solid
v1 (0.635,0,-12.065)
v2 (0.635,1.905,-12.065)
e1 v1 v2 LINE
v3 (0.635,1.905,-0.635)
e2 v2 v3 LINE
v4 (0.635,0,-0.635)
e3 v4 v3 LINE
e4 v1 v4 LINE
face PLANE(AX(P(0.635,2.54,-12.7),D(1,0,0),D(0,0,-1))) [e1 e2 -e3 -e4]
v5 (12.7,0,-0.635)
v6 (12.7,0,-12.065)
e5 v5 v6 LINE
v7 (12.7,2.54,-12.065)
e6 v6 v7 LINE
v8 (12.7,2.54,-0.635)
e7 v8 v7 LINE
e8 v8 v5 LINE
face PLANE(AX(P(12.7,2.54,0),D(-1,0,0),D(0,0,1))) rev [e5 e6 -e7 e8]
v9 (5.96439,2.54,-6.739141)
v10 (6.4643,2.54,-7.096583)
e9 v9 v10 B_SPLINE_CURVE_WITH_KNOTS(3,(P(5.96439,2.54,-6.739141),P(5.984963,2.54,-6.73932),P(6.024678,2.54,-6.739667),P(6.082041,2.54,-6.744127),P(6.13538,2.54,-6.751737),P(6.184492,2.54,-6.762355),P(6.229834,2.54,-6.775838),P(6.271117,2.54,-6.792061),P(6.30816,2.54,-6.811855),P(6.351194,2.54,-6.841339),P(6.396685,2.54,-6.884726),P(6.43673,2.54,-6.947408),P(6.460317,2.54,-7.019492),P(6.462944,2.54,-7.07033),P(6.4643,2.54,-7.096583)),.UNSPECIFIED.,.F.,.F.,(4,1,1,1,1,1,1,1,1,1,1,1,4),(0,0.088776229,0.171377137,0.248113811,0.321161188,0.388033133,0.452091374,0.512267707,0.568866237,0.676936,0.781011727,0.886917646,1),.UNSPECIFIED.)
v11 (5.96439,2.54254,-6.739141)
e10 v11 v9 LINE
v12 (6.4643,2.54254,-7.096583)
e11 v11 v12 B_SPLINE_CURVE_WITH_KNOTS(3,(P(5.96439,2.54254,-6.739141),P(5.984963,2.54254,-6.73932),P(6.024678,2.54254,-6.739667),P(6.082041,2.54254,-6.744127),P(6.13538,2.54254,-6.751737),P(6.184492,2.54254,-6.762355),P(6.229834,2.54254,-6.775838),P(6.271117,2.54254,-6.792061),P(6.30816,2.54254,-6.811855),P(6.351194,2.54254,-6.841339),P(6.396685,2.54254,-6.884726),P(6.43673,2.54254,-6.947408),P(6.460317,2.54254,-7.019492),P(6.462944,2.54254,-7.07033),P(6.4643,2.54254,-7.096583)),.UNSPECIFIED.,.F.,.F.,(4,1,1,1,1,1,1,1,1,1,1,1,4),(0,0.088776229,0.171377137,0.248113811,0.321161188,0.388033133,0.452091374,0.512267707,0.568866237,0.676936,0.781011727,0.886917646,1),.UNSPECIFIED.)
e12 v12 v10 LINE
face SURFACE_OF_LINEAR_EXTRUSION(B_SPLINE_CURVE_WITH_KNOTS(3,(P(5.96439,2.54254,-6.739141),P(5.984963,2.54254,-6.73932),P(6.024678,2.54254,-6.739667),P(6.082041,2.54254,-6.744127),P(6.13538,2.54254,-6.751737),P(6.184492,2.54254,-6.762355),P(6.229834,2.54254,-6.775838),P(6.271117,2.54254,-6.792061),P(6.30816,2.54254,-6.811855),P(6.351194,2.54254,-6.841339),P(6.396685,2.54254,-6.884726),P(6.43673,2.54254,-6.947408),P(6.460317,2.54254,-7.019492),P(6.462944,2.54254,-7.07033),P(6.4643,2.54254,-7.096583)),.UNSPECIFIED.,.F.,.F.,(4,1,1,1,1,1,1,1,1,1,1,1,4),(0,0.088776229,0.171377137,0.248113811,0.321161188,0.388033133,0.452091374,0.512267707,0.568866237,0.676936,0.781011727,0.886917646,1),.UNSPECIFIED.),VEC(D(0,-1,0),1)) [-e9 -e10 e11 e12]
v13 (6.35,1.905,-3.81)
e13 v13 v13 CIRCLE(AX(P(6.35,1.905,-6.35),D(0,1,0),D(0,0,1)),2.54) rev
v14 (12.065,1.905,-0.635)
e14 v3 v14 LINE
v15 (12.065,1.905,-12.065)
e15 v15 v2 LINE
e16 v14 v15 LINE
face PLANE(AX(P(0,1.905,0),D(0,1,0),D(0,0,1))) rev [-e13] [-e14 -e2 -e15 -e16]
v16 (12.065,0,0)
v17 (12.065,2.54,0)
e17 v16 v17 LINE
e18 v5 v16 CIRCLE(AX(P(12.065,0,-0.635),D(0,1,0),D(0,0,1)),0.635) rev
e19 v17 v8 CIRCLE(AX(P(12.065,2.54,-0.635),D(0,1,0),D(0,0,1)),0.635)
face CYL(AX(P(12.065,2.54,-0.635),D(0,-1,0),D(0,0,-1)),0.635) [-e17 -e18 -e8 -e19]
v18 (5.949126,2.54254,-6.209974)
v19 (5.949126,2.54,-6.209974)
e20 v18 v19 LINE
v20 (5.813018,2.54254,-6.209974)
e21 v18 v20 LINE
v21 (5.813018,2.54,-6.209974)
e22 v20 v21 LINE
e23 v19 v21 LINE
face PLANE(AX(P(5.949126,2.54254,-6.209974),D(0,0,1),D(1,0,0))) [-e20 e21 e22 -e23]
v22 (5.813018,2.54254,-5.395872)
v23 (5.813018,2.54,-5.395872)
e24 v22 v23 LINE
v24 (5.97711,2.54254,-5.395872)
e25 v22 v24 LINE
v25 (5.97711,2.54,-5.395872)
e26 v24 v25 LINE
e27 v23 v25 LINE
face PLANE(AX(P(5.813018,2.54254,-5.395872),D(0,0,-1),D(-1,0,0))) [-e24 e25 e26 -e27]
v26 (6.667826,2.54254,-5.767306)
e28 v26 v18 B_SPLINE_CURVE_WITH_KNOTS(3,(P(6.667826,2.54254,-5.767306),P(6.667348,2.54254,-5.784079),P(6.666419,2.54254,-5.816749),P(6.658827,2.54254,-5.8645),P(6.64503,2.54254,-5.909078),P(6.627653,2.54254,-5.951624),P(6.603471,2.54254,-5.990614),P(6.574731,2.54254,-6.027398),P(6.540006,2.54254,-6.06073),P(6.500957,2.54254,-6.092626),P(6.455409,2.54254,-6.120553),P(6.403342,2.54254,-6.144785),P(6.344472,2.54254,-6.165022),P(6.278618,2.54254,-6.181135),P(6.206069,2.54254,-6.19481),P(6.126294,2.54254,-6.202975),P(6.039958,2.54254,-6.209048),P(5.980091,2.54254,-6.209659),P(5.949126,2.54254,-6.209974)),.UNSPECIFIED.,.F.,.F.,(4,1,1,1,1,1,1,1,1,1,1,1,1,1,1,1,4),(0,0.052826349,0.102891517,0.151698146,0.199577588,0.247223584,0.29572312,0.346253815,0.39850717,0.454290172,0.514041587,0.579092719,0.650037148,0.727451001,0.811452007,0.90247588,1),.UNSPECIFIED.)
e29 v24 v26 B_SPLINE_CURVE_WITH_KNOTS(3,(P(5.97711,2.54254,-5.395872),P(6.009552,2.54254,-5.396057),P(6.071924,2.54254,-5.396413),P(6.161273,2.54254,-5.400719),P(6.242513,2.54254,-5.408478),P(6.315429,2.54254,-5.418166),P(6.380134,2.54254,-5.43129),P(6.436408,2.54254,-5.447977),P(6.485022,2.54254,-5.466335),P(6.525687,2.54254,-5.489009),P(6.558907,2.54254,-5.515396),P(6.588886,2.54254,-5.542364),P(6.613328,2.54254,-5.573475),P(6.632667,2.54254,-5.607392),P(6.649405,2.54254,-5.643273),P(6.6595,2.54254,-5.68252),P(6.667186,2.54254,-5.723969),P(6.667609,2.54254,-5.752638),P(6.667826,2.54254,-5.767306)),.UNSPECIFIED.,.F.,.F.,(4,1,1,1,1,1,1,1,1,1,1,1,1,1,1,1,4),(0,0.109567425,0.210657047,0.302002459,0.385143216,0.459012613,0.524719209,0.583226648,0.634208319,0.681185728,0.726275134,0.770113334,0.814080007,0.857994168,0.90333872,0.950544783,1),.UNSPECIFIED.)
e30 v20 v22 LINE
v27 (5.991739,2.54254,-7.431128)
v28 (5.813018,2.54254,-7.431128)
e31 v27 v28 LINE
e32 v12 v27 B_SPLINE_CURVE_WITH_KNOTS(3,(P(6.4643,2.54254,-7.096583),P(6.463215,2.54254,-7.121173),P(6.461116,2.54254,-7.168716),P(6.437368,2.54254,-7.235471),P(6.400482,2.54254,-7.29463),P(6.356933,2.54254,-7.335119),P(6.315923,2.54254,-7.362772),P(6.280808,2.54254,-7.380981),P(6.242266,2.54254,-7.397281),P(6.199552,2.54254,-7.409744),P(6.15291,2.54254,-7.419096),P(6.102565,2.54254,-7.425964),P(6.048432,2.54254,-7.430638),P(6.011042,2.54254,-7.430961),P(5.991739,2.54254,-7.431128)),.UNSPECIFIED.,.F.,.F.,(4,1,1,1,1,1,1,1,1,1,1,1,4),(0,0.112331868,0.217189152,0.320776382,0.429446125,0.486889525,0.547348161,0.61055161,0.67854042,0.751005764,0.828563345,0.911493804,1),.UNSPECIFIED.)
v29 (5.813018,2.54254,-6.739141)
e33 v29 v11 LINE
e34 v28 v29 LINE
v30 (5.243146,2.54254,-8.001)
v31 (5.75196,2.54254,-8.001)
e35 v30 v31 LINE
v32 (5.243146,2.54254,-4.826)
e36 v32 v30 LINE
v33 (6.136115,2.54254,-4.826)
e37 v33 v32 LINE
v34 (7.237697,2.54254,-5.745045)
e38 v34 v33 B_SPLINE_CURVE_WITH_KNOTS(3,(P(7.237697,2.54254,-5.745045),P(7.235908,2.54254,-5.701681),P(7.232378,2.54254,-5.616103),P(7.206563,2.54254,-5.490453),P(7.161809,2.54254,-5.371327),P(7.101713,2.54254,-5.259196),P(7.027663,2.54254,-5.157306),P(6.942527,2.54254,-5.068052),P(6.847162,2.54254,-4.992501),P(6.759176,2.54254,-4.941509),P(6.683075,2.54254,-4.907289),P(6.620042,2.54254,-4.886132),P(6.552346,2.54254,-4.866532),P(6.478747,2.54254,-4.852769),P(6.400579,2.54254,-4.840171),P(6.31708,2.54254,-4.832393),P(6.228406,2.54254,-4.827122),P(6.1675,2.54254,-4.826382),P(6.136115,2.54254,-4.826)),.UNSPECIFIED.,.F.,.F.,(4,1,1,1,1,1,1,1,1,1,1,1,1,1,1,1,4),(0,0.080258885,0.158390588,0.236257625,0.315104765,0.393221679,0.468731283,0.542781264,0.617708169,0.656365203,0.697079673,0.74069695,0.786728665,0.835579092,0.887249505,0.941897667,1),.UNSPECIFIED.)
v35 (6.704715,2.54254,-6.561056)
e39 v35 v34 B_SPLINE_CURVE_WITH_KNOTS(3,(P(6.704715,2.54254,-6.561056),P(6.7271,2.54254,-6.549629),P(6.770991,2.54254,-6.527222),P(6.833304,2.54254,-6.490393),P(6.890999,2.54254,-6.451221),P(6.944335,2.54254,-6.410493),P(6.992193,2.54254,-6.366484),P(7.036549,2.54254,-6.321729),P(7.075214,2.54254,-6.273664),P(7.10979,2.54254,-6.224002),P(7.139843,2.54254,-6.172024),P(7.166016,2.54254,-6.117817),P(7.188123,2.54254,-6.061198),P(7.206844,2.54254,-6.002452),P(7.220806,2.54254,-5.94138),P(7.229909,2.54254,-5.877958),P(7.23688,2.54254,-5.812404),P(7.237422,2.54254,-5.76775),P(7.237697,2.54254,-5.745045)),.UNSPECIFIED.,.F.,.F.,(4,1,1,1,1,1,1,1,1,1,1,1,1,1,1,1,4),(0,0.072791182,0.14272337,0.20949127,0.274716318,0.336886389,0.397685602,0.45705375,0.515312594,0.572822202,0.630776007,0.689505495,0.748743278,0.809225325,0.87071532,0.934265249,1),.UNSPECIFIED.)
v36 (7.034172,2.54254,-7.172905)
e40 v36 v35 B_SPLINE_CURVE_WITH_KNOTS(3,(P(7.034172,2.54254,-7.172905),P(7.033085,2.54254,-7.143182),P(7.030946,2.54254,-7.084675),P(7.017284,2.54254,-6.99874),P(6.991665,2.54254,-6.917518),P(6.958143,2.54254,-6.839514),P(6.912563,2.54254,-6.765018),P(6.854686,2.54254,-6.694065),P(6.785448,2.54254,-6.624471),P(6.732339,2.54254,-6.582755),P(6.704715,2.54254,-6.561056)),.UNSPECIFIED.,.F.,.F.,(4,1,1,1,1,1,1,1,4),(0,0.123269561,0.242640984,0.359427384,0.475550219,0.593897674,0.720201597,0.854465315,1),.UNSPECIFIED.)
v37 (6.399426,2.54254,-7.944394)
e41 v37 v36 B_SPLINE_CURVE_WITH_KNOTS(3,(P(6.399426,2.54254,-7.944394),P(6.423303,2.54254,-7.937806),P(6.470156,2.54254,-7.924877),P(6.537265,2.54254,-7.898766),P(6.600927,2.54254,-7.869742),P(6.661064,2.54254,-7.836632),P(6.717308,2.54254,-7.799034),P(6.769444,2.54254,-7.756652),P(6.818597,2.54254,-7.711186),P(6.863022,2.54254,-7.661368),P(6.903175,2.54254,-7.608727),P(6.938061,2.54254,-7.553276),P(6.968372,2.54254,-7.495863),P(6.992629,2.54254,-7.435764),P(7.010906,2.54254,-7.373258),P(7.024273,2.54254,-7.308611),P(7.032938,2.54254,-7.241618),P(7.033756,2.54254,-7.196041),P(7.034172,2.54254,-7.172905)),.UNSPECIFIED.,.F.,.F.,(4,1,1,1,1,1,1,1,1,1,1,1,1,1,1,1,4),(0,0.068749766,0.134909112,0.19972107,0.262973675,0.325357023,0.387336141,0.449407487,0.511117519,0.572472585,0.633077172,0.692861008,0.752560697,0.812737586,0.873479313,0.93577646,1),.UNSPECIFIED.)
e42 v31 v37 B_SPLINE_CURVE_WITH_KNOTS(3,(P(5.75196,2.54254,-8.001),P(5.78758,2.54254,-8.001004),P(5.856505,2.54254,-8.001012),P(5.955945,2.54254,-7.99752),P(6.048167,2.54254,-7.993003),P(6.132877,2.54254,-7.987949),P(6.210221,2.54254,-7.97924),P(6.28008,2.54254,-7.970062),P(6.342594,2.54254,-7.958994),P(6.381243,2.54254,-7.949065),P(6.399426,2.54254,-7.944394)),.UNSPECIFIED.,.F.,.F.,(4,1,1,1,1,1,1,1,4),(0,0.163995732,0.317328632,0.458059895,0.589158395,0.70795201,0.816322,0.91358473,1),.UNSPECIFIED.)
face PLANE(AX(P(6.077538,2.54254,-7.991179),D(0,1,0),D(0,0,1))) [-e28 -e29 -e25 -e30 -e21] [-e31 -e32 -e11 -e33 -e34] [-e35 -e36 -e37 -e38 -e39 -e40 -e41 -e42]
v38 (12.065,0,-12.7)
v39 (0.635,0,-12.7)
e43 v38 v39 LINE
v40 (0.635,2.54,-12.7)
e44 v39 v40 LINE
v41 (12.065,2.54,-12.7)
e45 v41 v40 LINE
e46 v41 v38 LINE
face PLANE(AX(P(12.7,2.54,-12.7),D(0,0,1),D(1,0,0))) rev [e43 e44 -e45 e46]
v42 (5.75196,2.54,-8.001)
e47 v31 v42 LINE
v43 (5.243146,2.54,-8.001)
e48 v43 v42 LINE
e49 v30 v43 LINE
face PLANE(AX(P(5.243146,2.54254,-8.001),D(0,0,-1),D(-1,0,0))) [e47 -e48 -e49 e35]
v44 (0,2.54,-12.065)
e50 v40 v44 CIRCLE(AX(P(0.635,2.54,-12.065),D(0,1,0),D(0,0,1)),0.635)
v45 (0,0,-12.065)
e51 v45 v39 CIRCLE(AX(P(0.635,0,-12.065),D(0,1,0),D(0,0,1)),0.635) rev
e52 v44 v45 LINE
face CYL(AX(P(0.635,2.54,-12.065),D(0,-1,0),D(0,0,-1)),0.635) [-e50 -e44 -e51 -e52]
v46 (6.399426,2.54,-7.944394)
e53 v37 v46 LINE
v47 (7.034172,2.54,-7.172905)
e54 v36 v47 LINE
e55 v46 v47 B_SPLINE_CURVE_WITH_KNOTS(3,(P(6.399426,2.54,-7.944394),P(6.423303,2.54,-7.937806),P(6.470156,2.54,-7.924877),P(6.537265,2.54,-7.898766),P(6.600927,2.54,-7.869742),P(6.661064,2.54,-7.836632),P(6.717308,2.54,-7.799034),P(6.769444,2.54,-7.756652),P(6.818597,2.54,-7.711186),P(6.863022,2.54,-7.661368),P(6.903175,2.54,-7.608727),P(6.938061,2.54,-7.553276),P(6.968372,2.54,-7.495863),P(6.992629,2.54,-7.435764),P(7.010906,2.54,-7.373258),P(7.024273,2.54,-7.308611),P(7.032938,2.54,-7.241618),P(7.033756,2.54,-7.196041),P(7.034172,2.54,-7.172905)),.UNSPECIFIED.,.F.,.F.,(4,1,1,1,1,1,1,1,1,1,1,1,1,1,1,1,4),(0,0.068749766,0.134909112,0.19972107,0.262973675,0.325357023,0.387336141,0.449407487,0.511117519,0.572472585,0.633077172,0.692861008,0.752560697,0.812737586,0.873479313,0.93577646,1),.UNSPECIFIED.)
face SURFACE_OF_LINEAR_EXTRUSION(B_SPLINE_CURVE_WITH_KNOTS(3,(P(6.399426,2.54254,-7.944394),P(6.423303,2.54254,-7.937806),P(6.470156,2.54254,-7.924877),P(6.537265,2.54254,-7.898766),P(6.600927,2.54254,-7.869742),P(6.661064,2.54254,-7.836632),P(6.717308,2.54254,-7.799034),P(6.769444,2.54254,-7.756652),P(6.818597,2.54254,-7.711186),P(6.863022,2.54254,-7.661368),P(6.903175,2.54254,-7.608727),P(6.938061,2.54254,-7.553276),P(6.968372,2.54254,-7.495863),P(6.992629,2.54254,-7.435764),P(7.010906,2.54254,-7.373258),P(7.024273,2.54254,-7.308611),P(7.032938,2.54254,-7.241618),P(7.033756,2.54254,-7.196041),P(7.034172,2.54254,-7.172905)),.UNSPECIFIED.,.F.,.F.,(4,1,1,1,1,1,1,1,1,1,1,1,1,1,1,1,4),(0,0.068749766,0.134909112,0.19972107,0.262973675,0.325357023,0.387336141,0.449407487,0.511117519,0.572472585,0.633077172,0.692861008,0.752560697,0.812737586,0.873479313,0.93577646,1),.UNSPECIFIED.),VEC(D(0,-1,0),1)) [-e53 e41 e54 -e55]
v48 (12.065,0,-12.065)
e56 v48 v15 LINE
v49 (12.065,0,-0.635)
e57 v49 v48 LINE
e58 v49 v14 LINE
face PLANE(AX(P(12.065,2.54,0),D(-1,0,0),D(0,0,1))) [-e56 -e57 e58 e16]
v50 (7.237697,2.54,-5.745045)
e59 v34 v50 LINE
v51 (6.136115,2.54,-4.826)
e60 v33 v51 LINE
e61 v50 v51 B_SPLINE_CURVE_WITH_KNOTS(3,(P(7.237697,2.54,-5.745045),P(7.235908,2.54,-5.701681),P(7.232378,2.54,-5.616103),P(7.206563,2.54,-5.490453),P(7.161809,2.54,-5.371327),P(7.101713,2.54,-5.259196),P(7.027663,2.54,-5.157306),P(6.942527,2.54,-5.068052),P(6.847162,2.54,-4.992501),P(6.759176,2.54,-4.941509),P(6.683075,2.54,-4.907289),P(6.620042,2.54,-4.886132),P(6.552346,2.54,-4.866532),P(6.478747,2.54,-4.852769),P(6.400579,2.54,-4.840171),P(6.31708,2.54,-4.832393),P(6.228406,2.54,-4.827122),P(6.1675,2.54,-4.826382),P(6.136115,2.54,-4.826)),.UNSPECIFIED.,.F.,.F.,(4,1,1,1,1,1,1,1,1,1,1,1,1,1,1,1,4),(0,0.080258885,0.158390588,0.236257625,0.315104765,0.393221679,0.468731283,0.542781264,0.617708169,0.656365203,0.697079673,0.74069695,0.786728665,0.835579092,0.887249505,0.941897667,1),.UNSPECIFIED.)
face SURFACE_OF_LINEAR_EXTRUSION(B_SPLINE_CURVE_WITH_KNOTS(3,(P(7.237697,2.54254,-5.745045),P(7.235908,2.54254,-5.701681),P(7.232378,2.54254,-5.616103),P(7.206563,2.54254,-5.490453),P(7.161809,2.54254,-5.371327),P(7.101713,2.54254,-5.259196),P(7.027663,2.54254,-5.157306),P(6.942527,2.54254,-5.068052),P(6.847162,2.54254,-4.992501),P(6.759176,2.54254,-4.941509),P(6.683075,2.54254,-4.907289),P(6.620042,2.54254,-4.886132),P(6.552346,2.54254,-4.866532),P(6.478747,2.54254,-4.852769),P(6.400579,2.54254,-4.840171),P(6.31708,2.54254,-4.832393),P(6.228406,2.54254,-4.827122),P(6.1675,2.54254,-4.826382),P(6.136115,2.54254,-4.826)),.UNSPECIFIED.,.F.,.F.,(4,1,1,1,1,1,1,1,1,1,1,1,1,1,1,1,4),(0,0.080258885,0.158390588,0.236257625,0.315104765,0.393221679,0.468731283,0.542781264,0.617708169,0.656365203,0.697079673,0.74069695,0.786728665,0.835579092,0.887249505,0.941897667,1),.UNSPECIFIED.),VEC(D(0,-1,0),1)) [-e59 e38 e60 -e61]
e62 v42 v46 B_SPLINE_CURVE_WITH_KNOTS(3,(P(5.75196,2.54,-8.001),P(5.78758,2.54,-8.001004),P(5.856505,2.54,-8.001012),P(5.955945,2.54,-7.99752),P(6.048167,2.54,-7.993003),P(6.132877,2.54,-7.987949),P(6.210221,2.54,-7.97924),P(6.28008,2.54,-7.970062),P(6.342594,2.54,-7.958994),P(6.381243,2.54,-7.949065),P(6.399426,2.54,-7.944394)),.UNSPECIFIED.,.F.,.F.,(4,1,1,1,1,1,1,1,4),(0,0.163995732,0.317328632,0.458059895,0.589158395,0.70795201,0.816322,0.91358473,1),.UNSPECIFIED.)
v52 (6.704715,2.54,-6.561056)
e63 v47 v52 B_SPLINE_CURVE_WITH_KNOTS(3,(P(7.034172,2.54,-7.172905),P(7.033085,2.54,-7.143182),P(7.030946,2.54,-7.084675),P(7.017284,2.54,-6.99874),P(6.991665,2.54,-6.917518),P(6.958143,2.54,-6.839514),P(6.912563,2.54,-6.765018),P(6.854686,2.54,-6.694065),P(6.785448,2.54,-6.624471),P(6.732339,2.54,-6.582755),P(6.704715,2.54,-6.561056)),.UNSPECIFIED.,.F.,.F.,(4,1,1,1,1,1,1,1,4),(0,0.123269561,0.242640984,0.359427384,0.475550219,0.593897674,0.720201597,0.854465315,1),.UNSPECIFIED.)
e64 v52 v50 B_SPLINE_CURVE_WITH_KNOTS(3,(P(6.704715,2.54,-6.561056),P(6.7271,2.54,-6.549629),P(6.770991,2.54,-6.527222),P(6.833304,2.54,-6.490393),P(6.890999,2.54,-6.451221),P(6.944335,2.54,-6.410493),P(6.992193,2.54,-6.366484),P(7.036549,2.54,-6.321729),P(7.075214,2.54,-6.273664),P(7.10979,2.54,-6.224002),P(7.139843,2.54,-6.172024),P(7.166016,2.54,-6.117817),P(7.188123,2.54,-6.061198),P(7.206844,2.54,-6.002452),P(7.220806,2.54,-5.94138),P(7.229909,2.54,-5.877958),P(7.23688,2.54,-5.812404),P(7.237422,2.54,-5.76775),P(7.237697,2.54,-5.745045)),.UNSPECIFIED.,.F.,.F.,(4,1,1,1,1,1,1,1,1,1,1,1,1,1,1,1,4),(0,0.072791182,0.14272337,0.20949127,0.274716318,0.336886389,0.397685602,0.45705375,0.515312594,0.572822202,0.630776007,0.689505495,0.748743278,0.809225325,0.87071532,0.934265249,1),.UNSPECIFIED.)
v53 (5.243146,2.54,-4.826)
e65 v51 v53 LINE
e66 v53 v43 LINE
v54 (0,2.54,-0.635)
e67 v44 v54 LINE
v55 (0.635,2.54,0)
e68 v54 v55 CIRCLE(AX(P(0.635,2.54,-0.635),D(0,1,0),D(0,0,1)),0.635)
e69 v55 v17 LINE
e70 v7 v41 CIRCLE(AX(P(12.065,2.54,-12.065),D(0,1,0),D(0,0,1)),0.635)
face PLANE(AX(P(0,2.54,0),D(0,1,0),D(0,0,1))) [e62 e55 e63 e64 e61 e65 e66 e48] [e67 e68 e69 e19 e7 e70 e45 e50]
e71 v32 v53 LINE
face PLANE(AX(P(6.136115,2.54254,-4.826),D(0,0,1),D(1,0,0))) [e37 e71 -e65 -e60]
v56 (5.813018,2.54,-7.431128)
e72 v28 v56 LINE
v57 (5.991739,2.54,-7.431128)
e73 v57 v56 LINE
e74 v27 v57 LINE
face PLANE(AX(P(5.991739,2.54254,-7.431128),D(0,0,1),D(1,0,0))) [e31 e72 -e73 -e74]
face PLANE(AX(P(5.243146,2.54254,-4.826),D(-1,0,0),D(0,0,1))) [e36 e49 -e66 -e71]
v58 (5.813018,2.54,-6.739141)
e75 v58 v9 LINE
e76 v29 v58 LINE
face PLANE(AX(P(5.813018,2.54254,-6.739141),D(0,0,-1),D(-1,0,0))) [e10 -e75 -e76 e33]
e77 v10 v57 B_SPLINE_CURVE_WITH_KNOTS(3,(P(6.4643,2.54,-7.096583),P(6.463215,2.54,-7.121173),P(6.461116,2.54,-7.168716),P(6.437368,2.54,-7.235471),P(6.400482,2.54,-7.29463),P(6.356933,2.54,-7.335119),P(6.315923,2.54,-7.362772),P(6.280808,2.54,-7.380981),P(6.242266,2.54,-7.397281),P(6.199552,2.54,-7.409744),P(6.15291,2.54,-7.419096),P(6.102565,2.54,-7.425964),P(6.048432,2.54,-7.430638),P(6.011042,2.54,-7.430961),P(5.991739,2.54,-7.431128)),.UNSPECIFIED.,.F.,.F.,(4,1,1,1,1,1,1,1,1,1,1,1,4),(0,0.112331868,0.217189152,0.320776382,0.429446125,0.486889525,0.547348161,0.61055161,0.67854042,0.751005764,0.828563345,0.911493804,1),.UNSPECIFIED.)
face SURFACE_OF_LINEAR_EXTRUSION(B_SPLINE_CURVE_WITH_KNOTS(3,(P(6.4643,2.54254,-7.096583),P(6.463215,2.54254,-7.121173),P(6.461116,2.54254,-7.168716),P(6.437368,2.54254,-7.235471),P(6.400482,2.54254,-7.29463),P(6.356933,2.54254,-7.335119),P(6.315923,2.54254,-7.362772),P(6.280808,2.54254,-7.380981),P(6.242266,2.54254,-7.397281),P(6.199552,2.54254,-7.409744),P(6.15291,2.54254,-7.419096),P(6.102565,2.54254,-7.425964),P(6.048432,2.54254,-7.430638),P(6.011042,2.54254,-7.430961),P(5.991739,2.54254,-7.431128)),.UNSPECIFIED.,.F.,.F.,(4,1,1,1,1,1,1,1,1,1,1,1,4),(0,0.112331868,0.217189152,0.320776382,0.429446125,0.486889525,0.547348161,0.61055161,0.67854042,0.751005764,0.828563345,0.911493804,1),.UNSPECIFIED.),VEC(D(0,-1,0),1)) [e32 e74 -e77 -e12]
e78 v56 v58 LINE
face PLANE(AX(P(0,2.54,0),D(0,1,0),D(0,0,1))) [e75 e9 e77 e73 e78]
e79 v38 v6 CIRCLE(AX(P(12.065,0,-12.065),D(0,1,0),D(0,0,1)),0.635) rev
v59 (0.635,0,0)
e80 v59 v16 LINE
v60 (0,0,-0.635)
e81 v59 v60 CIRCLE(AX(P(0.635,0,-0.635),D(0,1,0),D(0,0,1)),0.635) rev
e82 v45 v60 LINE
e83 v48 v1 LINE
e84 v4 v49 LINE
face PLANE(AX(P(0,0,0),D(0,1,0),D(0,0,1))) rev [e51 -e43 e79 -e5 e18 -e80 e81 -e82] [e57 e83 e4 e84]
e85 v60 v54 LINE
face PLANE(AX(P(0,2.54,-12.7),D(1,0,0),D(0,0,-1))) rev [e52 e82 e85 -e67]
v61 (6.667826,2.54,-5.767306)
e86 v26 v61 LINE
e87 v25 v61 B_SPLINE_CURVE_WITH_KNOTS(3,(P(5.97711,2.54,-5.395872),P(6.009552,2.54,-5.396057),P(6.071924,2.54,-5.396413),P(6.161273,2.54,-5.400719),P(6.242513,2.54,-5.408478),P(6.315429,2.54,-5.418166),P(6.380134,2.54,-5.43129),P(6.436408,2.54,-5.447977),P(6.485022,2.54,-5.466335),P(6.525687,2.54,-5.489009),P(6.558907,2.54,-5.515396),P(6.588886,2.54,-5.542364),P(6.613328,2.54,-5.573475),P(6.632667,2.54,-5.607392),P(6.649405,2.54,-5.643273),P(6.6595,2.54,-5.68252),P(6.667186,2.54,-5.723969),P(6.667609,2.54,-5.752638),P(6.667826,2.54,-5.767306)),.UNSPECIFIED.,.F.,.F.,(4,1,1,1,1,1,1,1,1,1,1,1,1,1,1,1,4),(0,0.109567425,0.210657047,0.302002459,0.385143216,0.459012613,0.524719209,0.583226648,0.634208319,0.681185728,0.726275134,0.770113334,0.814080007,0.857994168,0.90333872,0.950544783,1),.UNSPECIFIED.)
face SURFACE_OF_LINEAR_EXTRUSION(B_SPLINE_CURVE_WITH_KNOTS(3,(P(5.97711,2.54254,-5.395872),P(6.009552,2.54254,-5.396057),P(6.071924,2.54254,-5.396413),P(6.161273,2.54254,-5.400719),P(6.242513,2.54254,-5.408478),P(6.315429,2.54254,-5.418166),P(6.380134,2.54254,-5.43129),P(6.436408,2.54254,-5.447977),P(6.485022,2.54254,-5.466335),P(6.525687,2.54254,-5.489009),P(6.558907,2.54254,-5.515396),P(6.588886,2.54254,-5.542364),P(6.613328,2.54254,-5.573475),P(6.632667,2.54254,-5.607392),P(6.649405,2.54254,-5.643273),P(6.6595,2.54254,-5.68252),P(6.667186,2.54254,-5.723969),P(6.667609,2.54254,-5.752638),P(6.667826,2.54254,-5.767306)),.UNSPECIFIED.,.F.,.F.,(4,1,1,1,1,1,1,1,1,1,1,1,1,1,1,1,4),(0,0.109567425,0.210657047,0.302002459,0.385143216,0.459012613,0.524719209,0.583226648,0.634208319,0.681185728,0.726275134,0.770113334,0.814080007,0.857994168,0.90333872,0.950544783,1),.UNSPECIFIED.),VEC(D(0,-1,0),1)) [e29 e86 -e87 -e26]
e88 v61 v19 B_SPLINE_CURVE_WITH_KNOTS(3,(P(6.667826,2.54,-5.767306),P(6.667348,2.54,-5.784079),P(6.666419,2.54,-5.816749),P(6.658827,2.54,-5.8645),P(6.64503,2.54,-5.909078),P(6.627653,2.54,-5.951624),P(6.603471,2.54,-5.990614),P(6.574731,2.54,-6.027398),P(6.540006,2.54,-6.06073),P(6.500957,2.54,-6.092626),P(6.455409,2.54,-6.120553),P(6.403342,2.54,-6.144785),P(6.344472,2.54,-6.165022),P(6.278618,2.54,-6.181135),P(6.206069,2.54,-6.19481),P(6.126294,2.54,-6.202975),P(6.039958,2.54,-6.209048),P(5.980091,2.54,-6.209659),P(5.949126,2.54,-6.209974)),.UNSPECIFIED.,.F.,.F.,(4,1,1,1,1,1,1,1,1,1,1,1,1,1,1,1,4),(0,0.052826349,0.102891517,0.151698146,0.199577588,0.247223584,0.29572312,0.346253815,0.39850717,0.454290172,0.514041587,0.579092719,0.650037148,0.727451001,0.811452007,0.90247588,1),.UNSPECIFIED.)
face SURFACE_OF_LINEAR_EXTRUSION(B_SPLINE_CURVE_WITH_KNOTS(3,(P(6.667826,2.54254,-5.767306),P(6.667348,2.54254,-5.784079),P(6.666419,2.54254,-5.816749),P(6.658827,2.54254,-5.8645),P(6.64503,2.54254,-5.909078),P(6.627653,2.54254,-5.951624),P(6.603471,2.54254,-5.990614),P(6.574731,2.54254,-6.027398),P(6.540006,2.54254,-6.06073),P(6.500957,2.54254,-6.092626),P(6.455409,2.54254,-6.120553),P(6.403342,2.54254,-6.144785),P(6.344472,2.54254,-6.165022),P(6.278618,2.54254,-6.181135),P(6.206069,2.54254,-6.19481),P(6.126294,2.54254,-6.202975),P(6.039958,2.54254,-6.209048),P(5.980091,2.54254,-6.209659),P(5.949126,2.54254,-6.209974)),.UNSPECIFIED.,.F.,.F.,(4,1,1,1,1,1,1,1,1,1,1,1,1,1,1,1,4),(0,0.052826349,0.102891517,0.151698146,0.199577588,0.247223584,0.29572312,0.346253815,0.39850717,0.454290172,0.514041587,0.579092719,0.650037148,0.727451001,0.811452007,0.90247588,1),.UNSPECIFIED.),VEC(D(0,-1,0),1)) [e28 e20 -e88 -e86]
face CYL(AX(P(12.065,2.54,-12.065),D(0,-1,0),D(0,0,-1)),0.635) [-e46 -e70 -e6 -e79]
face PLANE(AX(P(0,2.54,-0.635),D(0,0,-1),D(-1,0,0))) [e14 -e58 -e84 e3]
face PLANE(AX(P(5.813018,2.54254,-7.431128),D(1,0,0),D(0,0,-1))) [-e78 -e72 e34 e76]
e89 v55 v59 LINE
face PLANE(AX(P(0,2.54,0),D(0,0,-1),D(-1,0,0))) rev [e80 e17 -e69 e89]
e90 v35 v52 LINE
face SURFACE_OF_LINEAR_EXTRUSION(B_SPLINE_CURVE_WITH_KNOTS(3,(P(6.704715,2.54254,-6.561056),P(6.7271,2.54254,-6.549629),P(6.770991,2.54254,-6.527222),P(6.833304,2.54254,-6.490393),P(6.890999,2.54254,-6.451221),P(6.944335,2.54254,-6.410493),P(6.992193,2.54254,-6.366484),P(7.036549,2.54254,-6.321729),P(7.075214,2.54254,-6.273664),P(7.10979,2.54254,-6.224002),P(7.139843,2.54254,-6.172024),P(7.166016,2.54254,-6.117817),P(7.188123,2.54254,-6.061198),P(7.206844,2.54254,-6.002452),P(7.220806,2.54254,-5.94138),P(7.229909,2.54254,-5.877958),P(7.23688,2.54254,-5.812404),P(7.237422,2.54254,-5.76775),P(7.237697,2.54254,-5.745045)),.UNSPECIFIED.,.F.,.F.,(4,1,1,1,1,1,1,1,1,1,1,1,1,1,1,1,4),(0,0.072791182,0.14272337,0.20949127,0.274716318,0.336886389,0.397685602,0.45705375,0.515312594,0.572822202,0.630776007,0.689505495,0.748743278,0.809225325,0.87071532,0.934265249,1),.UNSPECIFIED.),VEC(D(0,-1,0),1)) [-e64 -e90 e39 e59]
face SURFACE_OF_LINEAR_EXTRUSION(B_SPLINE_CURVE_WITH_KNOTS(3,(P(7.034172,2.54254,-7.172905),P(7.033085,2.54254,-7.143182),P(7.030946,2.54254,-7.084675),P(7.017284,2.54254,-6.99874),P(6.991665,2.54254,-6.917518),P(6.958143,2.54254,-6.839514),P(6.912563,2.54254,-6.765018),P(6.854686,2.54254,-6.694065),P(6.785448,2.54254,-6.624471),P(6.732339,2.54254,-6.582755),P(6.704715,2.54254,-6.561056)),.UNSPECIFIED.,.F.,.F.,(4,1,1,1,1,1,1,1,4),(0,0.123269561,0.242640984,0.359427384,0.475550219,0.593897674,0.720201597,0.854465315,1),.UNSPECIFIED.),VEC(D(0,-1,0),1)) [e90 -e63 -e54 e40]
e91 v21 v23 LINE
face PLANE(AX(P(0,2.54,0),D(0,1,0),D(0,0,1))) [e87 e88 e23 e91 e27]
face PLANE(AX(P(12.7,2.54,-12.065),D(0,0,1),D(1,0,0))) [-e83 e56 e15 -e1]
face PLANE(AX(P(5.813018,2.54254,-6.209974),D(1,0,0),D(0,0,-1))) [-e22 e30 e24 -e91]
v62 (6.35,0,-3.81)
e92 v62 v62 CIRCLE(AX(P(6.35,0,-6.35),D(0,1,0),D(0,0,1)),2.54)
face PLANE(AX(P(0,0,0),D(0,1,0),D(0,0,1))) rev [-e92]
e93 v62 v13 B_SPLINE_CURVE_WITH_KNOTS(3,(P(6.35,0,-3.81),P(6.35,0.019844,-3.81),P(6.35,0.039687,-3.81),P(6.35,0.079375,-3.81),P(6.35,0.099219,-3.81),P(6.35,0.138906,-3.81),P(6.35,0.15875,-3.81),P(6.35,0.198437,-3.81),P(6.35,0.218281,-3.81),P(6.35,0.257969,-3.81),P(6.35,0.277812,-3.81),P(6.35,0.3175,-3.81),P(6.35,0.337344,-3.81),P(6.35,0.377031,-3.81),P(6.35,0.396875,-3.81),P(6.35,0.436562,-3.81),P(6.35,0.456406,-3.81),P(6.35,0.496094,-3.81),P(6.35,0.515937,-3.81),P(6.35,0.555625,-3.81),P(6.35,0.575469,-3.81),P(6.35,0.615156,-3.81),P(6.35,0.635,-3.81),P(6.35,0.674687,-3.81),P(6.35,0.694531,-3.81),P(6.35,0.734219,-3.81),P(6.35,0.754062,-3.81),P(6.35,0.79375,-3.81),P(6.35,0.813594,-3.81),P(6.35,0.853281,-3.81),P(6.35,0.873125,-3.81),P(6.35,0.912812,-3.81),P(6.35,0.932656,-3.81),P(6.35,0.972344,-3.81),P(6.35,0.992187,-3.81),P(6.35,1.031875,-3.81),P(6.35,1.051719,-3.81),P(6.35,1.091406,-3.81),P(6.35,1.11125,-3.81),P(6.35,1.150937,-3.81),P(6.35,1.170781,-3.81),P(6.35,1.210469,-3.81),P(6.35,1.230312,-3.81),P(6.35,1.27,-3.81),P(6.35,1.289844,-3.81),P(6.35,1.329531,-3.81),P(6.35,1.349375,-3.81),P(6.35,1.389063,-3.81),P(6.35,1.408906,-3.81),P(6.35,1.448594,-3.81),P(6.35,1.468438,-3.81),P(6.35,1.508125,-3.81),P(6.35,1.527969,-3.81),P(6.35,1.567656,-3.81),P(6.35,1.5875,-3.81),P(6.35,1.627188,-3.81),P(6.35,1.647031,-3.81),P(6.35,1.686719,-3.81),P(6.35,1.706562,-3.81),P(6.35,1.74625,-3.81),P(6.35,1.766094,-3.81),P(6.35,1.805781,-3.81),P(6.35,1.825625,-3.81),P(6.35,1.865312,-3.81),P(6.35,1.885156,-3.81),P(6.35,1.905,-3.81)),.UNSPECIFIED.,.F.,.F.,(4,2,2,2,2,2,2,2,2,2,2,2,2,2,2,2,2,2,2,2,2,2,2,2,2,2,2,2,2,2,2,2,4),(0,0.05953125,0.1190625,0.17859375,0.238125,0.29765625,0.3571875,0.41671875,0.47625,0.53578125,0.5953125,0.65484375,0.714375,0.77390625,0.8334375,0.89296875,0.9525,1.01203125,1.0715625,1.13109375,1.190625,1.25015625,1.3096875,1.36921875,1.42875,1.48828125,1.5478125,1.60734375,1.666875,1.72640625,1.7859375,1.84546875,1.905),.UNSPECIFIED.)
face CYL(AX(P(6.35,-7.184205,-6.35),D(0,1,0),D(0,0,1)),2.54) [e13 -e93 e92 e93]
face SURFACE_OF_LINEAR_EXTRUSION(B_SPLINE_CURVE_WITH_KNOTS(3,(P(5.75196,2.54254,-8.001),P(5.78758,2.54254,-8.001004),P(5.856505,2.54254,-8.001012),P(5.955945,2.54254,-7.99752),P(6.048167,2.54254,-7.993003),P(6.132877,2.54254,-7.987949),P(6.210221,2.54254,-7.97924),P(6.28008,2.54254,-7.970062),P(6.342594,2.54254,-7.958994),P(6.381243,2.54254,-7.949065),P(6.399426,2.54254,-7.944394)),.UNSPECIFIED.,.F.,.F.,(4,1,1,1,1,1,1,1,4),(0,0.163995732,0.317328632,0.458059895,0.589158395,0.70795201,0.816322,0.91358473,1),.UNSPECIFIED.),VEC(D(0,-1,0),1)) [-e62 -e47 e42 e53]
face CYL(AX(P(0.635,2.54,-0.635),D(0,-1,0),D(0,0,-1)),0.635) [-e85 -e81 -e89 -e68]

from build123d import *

# Parameters (mm, degrees)
SKETCH1_W           = 12.7
SKETCH1_H           = 12.7
BOSS_EXTRUDE1_DEPTH = 2.54
FILLET1_R           = 0.635
SHELL1_START        = 0.635
SHELL1_OUTLINE_W    = 1.905
SHELL1_OUTLINE_H    = 11.43
SHELL1_DEPTH        = 11.43
SKETCH2_R           = 2.54
BOSS_EXTRUDE2_DEPTH = 1.905
BOSS_EXTRUDE3_DEPTH = 0.00254


# Read off the part's stored shape, not the designer's step: Shell1
with BuildPart() as part:
    # Sketch1 → Boss-Extrude1 (new body)
    with BuildSketch(Plane(origin=(0, 0, 0), x_dir=(1, 0, 0), z_dir=(0, 1, 0))):
        with Locations((6.35, 6.35)):
            Rectangle(SKETCH1_W, SKETCH1_H)
    extrude(amount=BOSS_EXTRUDE1_DEPTH)

    # Fillet1
    fillet1_edges = [part.edges().sort_by_distance(p)[0] for p in [
        (0, 1.27, -12.7),
        (12.7, 1.27, -12.7),
        (12.7, 1.27, 0),
        (0, 1.27, 0),
    ]]
    fillet(fillet1_edges, radius=FILLET1_R)

    # Shell1 outline → Shell1 (cut)
    with BuildSketch(Plane.YZ.offset(SHELL1_START)):
        with Locations((0.9525, -6.35)):
            Rectangle(SHELL1_OUTLINE_W, SHELL1_OUTLINE_H)
    extrude(amount=SHELL1_DEPTH, mode=Mode.SUBTRACT)

    # Sketch2 → Boss-Extrude2 (add)
    with BuildSketch(Plane(origin=(0, 1.905, 0), x_dir=(-1, 0, 0), z_dir=(0, -1, 0))):
        with Locations(Location((-6.35, 6.35, 0), (0, 0, 270))):
            Circle(SKETCH2_R)
    extrude(amount=BOSS_EXTRUDE2_DEPTH)

    # Sketch3 → Boss-Extrude3 (add)
    with BuildSketch(Plane(origin=(0, 2.54, 0), x_dir=(1, 0, 0), z_dir=(0, 1, 0))):
        with BuildLine():
            Line((5.243146154, 4.826), (5.243146154, 8.001))
            Line((5.243146154, 8.001), (5.751960256, 8.001))
            add(Edge.make_bspline(
                [(5.751960256, 8.001), (5.787580425, 8.001004065), (5.856504776, 8.001011931), (5.955944627, 7.99751993), (6.048166691, 7.993002635), (6.132877481, 7.987948833), (6.210221182, 7.979240122), (6.280080178, 7.970062092), (6.34259405, 7.958993954), (6.381242981, 7.94906549), (6.399426202, 7.944394431)],
                knots=[0, 0, 0, 0, 1.311965854, 2.538629056, 3.664479157, 4.713267157, 5.663616078, 6.530575999, 7.308677837, 8, 8, 8, 8], degree=3))
            add(Edge.make_bspline(
                [(6.399426202, 7.944394431), (6.423302618, 7.937805819), (6.470155811, 7.924876846), (6.537264535, 7.898766227), (6.600926521, 7.869742423), (6.661064039, 7.836631691), (6.717307821, 7.799034291), (6.769444122, 7.75665184), (6.818597392, 7.711185567), (6.863022312, 7.66136834), (6.903175119, 7.608727211), (6.93806071, 7.553275975), (6.968371817, 7.495862516), (6.992628642, 7.435764324), (7.010905704, 7.373258168), (7.02427347, 7.308610959), (7.032937594, 7.241618137), (7.03375624, 7.19604073), (7.034171795, 7.172905048)],
                knots=[0, 0, 0, 0, 1.099996261, 2.158545794, 3.195537121, 4.207578794, 5.205712374, 6.197378256, 7.190519799, 8.17788031, 9.159561366, 10.129234751, 11.085776129, 12.040971148, 13.00380137, 13.975669004, 14.972423361, 16, 16, 16, 16], degree=3))
            add(Edge.make_bspline(
                [(7.034171795, 7.172905048), (7.033085241, 7.143181769), (7.030946494, 7.084675147), (7.01728403, 6.998739505), (6.99166478, 6.917517971), (6.958142616, 6.839513663), (6.912562953, 6.765017538), (6.854685596, 6.694065017), (6.785447969, 6.624471365), (6.732338887, 6.582754665), (6.704714663, 6.56105609)],
                knots=[0, 0, 0, 0, 0.986156485, 1.941127874, 2.875419072, 3.804401753, 4.751181392, 5.761612777, 6.835722519, 8, 8, 8, 8], degree=3))
            add(Edge.make_bspline(
                [(6.704714663, 6.56105609), (6.727100009, 6.549628565), (6.770991478, 6.527222351), (6.833304469, 6.490393223), (6.890999497, 6.451220775), (6.944335248, 6.410493172), (6.992192945, 6.366483912), (7.036548712, 6.321728868), (7.075214265, 6.273663764), (7.109790168, 6.22400173), (7.139842981, 6.172023655), (7.166015667, 6.117817318), (7.188122796, 6.061197538), (7.206843685, 6.002452465), (7.220805729, 5.941380042), (7.229909278, 5.877958428), (7.236879525, 5.812403923), (7.237421744, 5.76774983), (7.237697436, 5.745045473)],
                knots=[0, 0, 0, 0, 1.164658916, 2.283573913, 3.35186032, 4.395461096, 5.390182219, 6.362969632, 7.312859996, 8.245001507, 9.165155236, 10.092416118, 11.032087915, 11.979892451, 12.947605196, 13.931445124, 14.948243989, 16, 16, 16, 16], degree=3))
            add(Edge.make_bspline(
                [(7.237697436, 5.745045473), (7.235908383, 5.701681448), (7.232377694, 5.616102718), (7.20656302, 5.490453489), (7.161808578, 5.371326623), (7.101712592, 5.259195582), (7.027662773, 5.157306375), (6.942526717, 5.068052315), (6.847161548, 4.992500734), (6.759175654, 4.941509278), (6.683074784, 4.907289243), (6.620041855, 4.886132259), (6.552345826, 4.866532461), (6.478746667, 4.852769079), (6.400578631, 4.840171317), (6.317079575, 4.832393198), (6.228405558, 4.827122159), (6.167500409, 4.826381615), (6.136114904, 4.826)],
                knots=[0, 0, 0, 0, 1.284142165, 2.534249414, 3.780121997, 5.041676246, 6.291546858, 7.49970053, 8.684500223, 9.883330709, 10.50184324, 11.153274765, 11.851151195, 12.587658647, 13.369265475, 14.195992086, 15.070362669, 16, 16, 16, 16], degree=3))
            Line((6.136114904, 4.826), (5.243146154, 4.826))
        make_face()
        with BuildLine():
            Line((5.813017949, 7.431128205), (5.813017949, 6.739141026))
            Line((5.813017949, 6.739141026), (5.964390144, 6.739141026))
            add(Edge.make_bspline(
                [(5.964390144, 6.739141026), (5.984962986, 6.739320429), (6.024677611, 6.739666755), (6.082041174, 6.744127321), (6.135380025, 6.751737323), (6.184491859, 6.762355191), (6.229834171, 6.775838335), (6.271117303, 6.792061461), (6.308159738, 6.811855437), (6.351194481, 6.841339439), (6.396685308, 6.884726468), (6.436730371, 6.94740802), (6.460316645, 7.019491567), (6.46294352, 7.070330466), (6.4643, 7.096582933)],
                knots=[0, 0, 0, 0, 1.065314748, 2.056525647, 2.977365736, 3.853934255, 4.656397591, 5.425096493, 6.14721249, 6.826394842, 8.123232004, 9.372140726, 10.643011755, 12, 12, 12, 12], degree=3))
            add(Edge.make_bspline(
                [(6.4643, 7.096582933), (6.463214568, 7.12117273), (6.461115928, 7.168716114), (6.437367582, 7.235471259), (6.400481706, 7.29462998), (6.356932744, 7.335119286), (6.315922935, 7.362772289), (6.280807819, 7.380980614), (6.242266343, 7.39728052), (6.199552384, 7.409743825), (6.152909864, 7.419095851), (6.10256535, 7.425963794), (6.048431981, 7.430638408), (6.011041948, 7.430961437), (5.991738902, 7.431128205)],
                knots=[0, 0, 0, 0, 1.347982417, 2.606269829, 3.849316587, 5.153353503, 5.842674298, 6.568177932, 7.326619318, 8.142485038, 9.012069166, 9.942760135, 10.937925643, 12, 12, 12, 12], degree=3))
            Line((5.991738902, 7.431128205), (5.813017949, 7.431128205))
        make_face(mode=Mode.SUBTRACT)
        with BuildLine():
            Line((5.813017949, 6.209974359), (5.813017949, 5.395871795))
            Line((5.813017949, 5.395871795), (5.977110497, 5.395871795))
            add(Edge.make_bspline(
                [(5.977110497, 5.395871795), (6.009551802, 5.396057131), (6.071924261, 5.396413462), (6.161272697, 5.400718795), (6.242512762, 5.408478398), (6.315429202, 5.418165637), (6.3801337, 5.431290331), (6.436407542, 5.447976697), (6.485022448, 5.466334606), (6.525686923, 5.489008804), (6.558907469, 5.515395947), (6.588885529, 5.542364242), (6.613327771, 5.573474717), (6.632666929, 5.607391887), (6.649404936, 5.643273225), (6.65950012, 5.682519883), (6.667186238, 5.723968686), (6.667609226, 5.752637926), (6.667825641, 5.76730609)],
                knots=[0, 0, 0, 0, 1.753078804, 3.370512758, 4.83203934, 6.162291463, 7.344201807, 8.395507345, 9.331626367, 10.147333109, 10.898971645, 11.62040215, 12.321813352, 13.025280112, 13.727906689, 14.453419512, 15.208716525, 16, 16, 16, 16], degree=3))
            add(Edge.make_bspline(
                [(6.667825641, 5.76730609), (6.667348384, 5.784079366), (6.666418815, 5.816749196), (6.658827018, 5.864499638), (6.645030243, 5.909077845), (6.627652532, 5.95162374), (6.603470524, 5.990614032), (6.574731033, 6.027398029), (6.540006391, 6.060730109), (6.500956506, 6.092626322), (6.455408681, 6.120553184), (6.403341547, 6.144784684), (6.344472246, 6.165021941), (6.278618424, 6.181134857), (6.206068781, 6.194809667), (6.126293782, 6.202975038), (6.039957822, 6.209047983), (5.980091063, 6.209658551), (5.949125721, 6.209974359)],
                knots=[0, 0, 0, 0, 0.845221588, 1.646264278, 2.427170338, 3.19324141, 3.95557735, 4.731569926, 5.540061037, 6.376114724, 7.268642756, 8.224665384, 9.265483498, 10.400594375, 11.639216012, 12.983232105, 14.439614077, 16, 16, 16, 16], degree=3))
            Line((5.949125721, 6.209974359), (5.813017949, 6.209974359))
        make_face(mode=Mode.SUBTRACT)
    extrude(amount=BOSS_EXTRUDE3_DEPTH)


solid = part.part
